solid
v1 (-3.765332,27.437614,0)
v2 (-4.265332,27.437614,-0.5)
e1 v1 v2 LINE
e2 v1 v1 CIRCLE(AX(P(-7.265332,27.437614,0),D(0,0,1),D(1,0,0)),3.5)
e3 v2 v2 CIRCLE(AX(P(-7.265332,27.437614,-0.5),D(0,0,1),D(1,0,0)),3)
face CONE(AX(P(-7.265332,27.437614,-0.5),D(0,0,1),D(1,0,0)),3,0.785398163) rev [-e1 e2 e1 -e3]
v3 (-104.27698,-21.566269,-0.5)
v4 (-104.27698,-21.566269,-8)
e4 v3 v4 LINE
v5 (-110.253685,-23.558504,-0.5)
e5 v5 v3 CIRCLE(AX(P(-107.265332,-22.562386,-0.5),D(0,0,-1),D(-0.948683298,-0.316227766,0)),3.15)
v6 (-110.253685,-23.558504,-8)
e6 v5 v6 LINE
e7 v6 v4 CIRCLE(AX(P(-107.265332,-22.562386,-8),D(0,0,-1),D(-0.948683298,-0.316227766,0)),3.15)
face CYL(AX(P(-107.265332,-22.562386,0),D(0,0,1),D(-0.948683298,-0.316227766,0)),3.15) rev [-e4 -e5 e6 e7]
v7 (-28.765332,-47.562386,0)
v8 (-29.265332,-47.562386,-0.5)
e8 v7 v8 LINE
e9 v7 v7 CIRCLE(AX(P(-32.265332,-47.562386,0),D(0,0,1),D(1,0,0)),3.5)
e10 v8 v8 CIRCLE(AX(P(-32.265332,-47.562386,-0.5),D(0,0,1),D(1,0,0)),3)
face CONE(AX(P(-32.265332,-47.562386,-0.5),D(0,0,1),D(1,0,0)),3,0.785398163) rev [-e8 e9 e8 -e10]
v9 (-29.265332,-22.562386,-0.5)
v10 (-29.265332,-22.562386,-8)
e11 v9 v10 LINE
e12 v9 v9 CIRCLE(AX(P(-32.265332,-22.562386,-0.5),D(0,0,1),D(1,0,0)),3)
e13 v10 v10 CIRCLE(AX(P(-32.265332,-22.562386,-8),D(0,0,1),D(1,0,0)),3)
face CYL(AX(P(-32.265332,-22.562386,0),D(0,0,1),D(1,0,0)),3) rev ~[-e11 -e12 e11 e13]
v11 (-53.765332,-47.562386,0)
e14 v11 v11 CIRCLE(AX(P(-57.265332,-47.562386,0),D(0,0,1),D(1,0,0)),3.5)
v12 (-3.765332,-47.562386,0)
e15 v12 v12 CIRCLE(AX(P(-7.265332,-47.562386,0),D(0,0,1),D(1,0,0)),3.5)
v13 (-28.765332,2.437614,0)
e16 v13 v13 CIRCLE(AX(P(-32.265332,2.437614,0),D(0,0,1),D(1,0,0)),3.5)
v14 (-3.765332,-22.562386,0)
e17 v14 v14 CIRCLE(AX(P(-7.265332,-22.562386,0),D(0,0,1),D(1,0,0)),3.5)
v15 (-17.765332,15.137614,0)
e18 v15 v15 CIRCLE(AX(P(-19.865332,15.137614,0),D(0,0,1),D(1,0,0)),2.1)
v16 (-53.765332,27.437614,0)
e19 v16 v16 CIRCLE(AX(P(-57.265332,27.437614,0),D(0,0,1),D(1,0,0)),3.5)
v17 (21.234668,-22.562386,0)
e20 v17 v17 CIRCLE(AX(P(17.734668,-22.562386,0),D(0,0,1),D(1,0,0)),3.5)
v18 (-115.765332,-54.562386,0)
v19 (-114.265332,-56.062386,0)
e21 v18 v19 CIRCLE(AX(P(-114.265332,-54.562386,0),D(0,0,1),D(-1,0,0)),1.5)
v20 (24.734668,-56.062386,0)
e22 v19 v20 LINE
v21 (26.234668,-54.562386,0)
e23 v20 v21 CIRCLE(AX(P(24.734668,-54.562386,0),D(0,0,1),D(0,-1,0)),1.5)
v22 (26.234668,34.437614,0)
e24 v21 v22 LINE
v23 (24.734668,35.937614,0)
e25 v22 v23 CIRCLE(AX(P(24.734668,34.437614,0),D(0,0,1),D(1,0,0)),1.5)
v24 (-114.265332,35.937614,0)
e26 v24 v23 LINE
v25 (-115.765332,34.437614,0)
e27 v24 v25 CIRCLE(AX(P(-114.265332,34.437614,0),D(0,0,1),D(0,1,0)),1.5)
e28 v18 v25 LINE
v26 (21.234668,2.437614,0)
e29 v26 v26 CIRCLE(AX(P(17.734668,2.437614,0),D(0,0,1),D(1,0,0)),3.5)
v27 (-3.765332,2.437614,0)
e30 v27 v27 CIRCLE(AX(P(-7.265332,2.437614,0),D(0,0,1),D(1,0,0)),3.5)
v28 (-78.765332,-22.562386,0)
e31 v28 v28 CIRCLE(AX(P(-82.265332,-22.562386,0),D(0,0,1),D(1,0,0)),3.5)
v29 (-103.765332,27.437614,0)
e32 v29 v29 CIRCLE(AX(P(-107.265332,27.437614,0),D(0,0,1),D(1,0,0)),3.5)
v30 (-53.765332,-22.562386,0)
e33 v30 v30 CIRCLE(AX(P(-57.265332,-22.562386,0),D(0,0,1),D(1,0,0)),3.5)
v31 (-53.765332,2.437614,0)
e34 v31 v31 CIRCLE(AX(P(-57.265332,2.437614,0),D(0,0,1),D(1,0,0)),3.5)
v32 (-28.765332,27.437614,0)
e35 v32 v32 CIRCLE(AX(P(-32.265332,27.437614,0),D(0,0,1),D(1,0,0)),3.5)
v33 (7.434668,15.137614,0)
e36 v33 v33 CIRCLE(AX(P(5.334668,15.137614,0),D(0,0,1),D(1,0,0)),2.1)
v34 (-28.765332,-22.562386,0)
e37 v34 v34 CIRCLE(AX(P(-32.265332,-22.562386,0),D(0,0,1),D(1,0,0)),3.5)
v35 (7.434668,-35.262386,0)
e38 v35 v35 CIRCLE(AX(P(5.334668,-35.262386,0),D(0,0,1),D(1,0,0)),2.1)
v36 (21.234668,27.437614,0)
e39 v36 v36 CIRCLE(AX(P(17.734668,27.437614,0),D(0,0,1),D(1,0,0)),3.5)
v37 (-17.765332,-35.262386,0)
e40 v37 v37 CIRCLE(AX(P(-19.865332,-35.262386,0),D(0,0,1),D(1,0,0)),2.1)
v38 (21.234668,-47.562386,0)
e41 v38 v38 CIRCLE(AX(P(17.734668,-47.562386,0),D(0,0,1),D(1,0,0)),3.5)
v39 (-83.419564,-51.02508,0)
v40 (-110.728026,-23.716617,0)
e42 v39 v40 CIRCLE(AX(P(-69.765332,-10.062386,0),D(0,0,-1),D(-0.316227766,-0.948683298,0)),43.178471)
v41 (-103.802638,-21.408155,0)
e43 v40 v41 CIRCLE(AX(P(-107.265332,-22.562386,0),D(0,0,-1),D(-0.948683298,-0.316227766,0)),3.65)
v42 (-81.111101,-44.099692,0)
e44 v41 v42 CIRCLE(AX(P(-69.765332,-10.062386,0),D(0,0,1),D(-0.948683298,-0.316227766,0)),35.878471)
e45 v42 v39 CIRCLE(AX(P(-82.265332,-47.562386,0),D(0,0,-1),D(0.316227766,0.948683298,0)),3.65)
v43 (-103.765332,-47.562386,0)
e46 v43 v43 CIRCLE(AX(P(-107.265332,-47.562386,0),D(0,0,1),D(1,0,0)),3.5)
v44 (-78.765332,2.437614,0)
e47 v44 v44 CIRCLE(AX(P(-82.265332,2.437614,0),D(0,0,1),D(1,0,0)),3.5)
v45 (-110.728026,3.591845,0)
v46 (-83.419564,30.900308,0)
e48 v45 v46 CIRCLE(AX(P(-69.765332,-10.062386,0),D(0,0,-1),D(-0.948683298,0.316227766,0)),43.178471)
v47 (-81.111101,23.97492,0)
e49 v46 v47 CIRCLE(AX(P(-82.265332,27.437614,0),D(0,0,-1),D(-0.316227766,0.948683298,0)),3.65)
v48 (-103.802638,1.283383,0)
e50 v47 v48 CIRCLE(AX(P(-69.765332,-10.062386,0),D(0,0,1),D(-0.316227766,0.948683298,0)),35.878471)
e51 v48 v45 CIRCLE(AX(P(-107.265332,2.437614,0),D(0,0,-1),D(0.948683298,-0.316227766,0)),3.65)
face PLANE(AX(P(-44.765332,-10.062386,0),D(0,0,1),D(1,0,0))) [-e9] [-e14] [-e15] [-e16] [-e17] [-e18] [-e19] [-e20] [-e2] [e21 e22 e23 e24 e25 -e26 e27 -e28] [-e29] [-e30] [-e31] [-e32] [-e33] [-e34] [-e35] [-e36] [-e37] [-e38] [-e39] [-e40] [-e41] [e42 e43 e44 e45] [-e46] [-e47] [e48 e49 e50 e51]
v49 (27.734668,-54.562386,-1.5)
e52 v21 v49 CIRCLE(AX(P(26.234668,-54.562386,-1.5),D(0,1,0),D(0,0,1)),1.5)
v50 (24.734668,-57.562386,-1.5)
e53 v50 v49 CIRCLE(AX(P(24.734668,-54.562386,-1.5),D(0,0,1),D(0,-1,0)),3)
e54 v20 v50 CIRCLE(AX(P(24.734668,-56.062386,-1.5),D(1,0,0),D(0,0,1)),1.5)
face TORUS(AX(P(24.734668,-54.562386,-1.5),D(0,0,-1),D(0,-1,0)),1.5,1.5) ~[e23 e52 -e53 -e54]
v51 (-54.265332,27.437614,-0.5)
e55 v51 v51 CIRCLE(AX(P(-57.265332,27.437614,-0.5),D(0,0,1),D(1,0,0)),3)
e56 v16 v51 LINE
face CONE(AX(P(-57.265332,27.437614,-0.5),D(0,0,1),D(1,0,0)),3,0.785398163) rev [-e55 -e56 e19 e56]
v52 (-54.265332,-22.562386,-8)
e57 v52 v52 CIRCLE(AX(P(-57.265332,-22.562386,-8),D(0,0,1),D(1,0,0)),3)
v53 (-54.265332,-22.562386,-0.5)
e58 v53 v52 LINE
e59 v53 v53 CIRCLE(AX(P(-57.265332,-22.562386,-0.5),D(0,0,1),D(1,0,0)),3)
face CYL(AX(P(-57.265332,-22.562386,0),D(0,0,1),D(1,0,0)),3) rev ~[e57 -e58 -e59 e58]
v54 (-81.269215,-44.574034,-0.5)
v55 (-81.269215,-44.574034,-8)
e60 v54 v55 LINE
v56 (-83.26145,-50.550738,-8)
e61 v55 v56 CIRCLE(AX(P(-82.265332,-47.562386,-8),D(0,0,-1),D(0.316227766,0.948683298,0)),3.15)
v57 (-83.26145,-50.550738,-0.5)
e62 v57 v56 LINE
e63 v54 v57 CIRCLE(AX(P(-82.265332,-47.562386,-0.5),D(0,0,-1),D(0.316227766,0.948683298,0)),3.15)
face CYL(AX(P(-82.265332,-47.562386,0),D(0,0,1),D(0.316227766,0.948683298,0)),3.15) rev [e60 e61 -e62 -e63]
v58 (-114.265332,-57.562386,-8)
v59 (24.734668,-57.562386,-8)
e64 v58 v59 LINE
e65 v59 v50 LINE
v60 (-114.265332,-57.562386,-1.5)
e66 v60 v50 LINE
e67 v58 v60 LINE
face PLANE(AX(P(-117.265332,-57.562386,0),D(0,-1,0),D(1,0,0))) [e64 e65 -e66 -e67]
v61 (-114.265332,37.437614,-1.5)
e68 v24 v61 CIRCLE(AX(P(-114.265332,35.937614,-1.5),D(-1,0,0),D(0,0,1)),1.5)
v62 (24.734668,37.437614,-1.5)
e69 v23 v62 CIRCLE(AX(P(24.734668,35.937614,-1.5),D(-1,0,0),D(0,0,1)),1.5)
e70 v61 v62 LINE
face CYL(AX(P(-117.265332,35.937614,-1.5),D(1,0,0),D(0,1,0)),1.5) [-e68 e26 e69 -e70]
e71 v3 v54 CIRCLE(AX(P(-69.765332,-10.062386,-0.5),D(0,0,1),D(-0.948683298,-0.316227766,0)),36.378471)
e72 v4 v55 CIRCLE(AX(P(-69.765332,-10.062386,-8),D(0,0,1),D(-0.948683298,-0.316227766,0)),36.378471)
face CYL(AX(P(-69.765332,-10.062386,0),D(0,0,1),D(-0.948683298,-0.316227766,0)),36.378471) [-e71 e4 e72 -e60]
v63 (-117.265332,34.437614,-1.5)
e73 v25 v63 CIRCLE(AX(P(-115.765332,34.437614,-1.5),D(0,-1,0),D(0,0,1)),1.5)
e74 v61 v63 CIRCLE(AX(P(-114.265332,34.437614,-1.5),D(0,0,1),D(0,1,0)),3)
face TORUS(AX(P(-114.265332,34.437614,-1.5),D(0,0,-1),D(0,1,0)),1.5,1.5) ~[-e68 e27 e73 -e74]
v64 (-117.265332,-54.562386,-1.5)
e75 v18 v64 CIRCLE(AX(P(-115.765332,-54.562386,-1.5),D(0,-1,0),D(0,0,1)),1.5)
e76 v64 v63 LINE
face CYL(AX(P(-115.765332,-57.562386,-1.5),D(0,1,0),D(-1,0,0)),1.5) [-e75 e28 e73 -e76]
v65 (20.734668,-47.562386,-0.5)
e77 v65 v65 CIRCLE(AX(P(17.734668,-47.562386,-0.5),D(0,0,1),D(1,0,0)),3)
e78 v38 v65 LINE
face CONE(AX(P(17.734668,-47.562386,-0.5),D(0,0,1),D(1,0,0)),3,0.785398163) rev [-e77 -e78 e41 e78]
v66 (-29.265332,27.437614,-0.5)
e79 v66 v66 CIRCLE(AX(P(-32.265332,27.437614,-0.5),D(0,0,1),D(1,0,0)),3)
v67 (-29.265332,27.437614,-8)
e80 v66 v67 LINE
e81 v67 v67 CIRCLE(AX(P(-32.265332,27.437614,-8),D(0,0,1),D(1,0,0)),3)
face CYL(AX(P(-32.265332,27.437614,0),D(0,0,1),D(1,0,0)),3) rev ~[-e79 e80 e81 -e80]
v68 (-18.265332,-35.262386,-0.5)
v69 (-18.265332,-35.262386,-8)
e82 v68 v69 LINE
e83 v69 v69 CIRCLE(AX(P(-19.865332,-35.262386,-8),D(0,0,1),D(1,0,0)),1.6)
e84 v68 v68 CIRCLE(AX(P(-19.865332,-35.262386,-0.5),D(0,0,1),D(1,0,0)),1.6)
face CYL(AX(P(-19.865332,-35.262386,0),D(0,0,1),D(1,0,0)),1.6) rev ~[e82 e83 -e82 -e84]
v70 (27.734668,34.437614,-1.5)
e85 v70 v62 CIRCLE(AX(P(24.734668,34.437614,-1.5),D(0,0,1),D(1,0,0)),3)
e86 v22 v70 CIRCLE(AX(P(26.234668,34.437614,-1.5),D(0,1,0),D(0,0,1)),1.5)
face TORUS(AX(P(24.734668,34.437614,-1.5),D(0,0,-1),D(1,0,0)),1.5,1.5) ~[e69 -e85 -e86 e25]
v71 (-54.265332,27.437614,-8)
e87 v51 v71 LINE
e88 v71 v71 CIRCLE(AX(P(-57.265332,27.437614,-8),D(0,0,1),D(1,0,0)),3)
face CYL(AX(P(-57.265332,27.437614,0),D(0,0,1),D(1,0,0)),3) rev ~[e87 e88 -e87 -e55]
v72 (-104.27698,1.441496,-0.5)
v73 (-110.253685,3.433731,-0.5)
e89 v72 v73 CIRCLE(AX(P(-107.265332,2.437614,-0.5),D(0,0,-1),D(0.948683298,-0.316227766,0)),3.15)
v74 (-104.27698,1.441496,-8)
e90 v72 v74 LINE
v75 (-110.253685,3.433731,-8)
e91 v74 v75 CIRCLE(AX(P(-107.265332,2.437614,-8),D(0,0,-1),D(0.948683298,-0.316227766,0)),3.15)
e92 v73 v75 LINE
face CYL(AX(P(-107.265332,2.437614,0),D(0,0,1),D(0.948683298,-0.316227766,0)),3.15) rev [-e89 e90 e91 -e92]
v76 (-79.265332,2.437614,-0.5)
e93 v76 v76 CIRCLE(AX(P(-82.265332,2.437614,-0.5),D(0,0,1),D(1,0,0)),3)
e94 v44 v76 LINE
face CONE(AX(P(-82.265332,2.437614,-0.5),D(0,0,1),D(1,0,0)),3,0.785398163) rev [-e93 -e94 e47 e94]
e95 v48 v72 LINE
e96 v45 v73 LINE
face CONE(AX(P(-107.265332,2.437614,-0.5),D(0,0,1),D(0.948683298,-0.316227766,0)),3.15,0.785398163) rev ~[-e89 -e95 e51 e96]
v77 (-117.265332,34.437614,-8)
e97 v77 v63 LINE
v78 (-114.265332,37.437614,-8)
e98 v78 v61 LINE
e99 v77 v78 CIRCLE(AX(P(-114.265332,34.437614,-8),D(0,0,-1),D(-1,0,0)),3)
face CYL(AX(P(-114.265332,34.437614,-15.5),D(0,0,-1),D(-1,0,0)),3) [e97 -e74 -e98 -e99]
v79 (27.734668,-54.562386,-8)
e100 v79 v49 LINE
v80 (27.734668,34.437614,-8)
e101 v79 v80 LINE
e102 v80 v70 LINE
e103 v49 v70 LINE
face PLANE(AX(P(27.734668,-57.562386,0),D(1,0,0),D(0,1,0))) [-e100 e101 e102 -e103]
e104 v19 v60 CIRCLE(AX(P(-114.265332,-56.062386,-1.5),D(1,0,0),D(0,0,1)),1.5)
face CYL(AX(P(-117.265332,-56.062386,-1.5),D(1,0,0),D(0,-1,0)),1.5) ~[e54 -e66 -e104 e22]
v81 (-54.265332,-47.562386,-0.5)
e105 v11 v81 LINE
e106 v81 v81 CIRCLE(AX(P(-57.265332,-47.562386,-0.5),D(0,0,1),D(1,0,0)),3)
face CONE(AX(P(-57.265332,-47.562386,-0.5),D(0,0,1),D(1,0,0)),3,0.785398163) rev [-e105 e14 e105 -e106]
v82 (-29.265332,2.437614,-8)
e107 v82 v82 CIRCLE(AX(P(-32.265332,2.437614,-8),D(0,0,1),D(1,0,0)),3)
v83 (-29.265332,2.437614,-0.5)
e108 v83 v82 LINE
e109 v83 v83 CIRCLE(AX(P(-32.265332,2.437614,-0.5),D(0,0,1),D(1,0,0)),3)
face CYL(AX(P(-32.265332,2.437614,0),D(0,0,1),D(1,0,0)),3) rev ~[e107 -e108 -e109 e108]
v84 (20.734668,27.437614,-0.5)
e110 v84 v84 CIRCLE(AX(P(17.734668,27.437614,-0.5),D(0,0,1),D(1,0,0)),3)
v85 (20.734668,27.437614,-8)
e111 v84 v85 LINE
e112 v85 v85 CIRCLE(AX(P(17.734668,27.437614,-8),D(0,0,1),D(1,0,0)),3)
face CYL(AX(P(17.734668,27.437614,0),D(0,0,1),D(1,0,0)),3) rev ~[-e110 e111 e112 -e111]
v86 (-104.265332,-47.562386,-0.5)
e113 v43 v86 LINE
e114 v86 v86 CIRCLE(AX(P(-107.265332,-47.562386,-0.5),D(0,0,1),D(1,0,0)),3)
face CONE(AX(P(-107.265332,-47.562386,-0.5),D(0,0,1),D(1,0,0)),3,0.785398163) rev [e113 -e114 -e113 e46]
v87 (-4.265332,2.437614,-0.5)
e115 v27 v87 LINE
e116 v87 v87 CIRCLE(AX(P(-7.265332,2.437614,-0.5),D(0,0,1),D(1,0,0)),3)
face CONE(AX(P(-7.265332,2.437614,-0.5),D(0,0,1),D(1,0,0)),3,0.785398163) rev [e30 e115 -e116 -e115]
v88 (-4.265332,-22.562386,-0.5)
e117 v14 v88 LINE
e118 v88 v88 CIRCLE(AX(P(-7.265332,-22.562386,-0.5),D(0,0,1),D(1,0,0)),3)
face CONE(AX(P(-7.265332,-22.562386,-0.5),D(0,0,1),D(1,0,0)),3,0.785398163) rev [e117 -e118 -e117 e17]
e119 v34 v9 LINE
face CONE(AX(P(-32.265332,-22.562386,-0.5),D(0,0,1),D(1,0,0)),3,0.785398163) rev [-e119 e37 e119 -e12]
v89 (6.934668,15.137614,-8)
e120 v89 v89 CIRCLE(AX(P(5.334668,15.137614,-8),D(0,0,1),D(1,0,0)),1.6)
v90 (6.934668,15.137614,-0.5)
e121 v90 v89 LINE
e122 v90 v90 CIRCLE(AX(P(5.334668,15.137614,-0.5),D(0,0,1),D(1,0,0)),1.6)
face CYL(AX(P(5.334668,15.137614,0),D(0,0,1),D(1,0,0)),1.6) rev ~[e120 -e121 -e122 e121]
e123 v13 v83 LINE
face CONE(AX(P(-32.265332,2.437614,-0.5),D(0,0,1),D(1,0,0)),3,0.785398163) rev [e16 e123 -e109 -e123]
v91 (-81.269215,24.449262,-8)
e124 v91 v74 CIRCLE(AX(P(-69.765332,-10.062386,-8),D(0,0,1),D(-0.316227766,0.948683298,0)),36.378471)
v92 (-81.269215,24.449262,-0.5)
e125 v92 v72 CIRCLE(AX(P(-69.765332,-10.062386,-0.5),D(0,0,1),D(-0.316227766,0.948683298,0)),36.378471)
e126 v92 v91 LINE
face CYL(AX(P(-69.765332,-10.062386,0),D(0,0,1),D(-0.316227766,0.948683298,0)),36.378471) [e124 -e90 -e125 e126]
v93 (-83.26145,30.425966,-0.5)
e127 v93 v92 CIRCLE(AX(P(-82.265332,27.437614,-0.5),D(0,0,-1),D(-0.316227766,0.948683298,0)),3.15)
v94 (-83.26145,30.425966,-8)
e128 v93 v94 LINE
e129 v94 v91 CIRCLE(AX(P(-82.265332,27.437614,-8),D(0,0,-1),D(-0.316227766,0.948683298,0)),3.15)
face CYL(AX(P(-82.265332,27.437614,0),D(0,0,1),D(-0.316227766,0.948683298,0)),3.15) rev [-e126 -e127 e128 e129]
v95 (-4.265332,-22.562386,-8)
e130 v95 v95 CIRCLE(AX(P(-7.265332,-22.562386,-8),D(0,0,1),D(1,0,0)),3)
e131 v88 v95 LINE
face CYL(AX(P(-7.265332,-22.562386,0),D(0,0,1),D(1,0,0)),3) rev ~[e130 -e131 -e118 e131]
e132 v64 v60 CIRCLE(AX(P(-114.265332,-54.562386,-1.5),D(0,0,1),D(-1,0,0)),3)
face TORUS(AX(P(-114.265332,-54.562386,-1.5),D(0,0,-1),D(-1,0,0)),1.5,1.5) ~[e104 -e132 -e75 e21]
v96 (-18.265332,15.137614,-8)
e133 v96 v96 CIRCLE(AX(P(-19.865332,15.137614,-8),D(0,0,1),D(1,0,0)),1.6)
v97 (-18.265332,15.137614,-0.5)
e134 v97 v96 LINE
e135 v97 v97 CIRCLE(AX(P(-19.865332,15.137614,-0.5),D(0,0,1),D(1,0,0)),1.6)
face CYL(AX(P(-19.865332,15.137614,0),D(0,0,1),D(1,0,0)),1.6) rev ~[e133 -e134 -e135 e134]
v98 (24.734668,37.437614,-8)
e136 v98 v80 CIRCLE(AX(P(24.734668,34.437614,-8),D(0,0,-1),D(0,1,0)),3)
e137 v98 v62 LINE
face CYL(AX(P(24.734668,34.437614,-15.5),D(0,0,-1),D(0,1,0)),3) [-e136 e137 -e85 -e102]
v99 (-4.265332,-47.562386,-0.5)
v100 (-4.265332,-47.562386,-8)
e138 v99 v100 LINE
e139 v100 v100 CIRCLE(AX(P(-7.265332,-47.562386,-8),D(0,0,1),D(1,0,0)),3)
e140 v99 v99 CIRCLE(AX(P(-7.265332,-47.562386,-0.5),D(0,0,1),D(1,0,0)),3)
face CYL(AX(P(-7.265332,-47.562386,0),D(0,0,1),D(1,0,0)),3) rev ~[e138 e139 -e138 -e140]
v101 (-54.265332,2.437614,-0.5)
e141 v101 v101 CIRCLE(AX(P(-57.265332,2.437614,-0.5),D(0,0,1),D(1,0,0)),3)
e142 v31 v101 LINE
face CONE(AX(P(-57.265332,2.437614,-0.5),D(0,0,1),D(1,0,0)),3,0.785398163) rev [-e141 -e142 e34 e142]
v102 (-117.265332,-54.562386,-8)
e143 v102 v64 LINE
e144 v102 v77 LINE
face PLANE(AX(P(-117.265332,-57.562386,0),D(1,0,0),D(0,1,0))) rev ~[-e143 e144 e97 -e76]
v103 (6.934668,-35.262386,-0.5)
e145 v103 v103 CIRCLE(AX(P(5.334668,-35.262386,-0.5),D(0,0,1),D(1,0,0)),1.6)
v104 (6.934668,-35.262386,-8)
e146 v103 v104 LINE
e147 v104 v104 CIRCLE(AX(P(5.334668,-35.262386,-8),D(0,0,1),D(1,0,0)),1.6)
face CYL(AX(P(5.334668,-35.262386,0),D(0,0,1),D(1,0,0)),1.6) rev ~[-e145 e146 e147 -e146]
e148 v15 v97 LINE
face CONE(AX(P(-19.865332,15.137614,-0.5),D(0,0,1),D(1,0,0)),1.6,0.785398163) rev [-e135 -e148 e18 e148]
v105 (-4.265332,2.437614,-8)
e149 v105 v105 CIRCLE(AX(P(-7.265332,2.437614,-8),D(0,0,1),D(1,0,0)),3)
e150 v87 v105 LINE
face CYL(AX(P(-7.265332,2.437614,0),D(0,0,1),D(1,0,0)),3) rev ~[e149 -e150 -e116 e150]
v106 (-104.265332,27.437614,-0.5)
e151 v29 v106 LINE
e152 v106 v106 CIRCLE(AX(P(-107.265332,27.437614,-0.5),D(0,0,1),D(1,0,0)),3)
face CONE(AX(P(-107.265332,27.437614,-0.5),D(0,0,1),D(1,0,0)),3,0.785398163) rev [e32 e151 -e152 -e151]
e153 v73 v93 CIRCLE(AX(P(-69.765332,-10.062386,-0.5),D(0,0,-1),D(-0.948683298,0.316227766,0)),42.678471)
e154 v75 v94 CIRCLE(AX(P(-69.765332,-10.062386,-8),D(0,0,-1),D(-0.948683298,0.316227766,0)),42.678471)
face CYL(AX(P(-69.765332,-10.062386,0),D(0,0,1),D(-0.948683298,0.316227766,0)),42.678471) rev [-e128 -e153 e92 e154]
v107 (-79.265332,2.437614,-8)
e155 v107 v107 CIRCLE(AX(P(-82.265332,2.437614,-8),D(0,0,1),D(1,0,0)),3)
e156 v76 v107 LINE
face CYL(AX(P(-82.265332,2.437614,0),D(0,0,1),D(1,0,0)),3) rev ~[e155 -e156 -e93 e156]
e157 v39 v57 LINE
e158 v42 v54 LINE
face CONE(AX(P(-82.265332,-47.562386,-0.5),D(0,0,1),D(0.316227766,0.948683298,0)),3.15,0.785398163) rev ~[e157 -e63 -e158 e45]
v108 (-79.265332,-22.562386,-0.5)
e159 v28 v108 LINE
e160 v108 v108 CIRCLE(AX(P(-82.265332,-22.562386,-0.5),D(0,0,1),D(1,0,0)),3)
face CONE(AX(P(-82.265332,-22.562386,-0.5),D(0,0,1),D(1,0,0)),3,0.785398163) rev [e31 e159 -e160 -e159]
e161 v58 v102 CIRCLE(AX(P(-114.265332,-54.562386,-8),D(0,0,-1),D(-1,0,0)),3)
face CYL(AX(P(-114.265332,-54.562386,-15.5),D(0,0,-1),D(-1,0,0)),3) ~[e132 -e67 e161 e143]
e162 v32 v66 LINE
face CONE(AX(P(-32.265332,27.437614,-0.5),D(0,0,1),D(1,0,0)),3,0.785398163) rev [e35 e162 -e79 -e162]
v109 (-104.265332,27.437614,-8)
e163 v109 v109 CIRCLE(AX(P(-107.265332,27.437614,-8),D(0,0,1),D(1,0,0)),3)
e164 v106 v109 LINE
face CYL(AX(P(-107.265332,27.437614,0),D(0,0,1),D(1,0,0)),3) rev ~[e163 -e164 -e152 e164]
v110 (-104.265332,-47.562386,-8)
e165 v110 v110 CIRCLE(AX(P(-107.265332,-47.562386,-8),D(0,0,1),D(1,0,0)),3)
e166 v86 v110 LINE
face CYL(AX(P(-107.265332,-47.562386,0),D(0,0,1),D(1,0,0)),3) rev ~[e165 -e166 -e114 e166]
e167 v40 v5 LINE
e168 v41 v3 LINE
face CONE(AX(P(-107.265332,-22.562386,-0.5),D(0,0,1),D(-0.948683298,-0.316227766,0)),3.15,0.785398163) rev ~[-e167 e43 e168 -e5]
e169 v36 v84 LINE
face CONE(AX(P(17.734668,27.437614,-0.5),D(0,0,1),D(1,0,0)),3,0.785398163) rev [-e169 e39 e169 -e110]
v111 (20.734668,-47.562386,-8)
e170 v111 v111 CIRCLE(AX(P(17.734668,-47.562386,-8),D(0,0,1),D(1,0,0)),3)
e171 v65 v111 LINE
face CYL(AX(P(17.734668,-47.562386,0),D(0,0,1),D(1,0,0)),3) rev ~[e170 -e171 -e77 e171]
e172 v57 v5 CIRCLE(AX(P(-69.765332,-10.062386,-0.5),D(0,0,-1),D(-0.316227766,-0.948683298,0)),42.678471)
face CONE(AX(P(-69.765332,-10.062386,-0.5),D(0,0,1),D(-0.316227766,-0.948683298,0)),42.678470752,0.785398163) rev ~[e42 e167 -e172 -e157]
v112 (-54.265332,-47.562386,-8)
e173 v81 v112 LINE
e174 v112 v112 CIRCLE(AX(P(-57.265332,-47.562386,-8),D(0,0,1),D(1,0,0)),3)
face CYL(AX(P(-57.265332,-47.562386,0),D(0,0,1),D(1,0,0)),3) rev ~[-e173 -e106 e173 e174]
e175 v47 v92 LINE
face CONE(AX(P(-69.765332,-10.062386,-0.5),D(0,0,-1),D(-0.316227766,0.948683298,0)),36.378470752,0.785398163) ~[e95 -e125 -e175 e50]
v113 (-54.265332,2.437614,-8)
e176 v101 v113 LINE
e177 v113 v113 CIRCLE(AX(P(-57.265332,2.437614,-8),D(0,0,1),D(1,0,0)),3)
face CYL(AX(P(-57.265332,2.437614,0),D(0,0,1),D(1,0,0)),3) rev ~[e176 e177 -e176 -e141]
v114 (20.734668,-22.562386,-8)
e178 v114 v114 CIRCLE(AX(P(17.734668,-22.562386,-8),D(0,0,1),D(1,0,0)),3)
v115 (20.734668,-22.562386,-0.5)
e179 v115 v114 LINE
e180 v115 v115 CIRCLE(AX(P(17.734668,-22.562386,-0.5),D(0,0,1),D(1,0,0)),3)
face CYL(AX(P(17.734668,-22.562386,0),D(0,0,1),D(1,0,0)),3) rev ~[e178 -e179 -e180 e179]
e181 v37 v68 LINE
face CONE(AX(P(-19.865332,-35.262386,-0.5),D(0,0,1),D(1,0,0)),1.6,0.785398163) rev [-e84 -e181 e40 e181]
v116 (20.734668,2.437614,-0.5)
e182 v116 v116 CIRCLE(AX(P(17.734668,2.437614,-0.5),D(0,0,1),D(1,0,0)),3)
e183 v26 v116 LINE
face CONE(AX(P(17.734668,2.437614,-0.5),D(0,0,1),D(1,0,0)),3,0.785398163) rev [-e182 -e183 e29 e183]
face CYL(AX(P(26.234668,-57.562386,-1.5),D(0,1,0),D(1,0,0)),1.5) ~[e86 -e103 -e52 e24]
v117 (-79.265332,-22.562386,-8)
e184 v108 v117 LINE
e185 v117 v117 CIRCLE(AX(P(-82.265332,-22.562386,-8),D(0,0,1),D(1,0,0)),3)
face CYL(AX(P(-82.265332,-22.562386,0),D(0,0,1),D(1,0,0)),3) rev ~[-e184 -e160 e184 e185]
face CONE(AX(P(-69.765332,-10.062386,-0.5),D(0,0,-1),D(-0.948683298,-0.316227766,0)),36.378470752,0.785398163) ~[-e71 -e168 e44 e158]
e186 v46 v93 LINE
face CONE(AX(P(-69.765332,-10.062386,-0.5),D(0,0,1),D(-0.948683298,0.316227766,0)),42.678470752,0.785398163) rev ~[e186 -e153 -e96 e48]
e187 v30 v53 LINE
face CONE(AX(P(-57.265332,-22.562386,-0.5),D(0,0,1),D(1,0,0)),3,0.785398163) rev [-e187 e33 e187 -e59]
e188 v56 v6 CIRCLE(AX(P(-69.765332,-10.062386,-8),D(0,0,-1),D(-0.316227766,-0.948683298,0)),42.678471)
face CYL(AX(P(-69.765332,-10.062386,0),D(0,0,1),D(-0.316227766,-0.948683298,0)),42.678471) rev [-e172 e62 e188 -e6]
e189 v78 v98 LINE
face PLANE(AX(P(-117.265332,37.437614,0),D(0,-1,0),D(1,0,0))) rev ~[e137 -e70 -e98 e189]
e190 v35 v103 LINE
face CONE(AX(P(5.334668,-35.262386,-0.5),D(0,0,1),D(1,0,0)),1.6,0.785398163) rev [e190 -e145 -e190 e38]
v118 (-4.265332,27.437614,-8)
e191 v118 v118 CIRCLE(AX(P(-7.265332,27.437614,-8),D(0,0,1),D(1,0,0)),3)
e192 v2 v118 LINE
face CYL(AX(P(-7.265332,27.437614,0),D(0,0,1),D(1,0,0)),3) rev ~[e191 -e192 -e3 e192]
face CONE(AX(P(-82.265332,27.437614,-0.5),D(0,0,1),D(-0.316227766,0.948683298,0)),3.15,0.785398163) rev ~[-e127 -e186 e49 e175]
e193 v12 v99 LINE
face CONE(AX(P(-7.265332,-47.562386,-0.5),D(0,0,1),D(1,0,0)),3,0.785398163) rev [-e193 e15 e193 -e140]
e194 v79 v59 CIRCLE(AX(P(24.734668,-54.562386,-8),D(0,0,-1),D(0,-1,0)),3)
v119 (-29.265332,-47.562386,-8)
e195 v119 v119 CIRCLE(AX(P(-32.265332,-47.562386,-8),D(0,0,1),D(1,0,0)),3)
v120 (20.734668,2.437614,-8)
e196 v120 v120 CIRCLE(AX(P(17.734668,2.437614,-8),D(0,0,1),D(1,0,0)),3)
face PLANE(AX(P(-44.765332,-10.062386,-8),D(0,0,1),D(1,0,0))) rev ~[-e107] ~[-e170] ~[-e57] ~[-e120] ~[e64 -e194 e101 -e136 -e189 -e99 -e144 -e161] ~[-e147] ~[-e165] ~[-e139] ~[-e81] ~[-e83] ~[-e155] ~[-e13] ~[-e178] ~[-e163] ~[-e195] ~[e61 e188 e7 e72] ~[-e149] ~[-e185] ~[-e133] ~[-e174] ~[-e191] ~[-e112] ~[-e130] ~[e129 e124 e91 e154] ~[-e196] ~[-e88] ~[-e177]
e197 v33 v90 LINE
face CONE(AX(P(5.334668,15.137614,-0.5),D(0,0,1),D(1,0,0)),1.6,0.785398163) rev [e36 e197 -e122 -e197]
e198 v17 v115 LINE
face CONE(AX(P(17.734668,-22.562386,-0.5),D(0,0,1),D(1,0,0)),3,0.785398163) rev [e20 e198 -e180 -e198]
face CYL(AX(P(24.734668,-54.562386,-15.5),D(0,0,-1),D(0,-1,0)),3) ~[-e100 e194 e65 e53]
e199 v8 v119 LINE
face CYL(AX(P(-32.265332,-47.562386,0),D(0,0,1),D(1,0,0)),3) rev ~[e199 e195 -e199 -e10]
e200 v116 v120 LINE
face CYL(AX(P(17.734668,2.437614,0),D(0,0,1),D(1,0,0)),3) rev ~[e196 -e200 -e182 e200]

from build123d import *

# Parameters (mm, degrees)
F0_W         = 145
F0_H         = 95
F0_R         = 3
F0_R_2       = 1.6
F1_DEPTH     = 8
F2_R         = 1.5
F3_SIZE      = 0.5
F4_T1_DEPTH  = 15.5
F4_T4_ANGLE  = 90
F4_T6_ANGLE  = 90
F4_T8_ANGLE  = 90
F4_T10_ANGLE = 90


# Not quite as in the source:
# - a fillet or chamfer that OpenCascade refuses, or shapes differently, is made with other operations: its cross-section is extruded or revolved along the edge and cut away or added
# - a feature names something its author has since deleted; it is built from what else it names


with BuildPart() as f1:
    # F0 (on Top) → F1 (new body)
    with BuildSketch(Plane.XY):
        with Locations((-44.7653323412, -10.0623860955)):
            Rectangle(F0_W, F0_H)
        with Locations((-107.2653323412, -47.5623860955)):
            Circle(F0_R, mode=Mode.SUBTRACT)
        with BuildLine():
            ThreePointArc((-83.2614498041, -50.5507384844), (-99.9435684207, -40.240622175), (-110.2536847301, -23.5585035585))
            ThreePointArc((-110.2536847301, -23.5585035585), (-108.2614498041, -19.5740337067), (-104.2769799523, -21.5662686326))
            ThreePointArc((-104.2769799523, -21.5662686326), (-95.4887956992, -35.7858494535), (-81.2692148782, -44.5740337067))
            ThreePointArc((-81.2692148782, -44.5740337067), (-79.2769799523, -48.5585035585), (-83.2614498041, -50.5507384844))
        make_face(mode=Mode.SUBTRACT)
        with Locations((-57.2653323412, -47.5623860955)):
            Circle(F0_R, mode=Mode.SUBTRACT)
        with Locations((-82.2653323412, -22.5623860955)):
            Circle(F0_R, mode=Mode.SUBTRACT)
        with Locations((-57.2653323412, -22.5623860955)):
            Circle(F0_R, mode=Mode.SUBTRACT)
        with Locations((-32.2653323412, -47.5623860955)):
            Circle(F0_R, mode=Mode.SUBTRACT)
        with Locations((-19.8653323412, -35.2623860955)):
            Circle(F0_R_2, mode=Mode.SUBTRACT)
        with Locations((-7.2653323412, -47.5623860955)):
            Circle(F0_R, mode=Mode.SUBTRACT)
        with Locations((17.7346676588, -47.5623860955)):
            Circle(F0_R, mode=Mode.SUBTRACT)
        with Locations((5.3346676588, -35.2623860955)):
            Circle(F0_R_2, mode=Mode.SUBTRACT)
        with Locations((-32.2653323412, -22.5623860955)):
            Circle(F0_R, mode=Mode.SUBTRACT)
        with Locations((-7.2653323412, -22.5623860955)):
            Circle(F0_R, mode=Mode.SUBTRACT)
        with Locations((17.7346676588, -22.5623860955)):
            Circle(F0_R, mode=Mode.SUBTRACT)
        with Locations((-82.2653323412, 2.4376139045)):
            Circle(F0_R, mode=Mode.SUBTRACT)
        with Locations((-57.2653323412, 2.4376139045)):
            Circle(F0_R, mode=Mode.SUBTRACT)
        with BuildLine():
            ThreePointArc((-110.2536847301, 3.4337313674), (-99.9435684207, 20.115849984), (-83.2614498041, 30.4259662933))
            ThreePointArc((-83.2614498041, 30.4259662933), (-79.2769799523, 28.4337313674), (-81.2692148782, 24.4492615156))
            ThreePointArc((-81.2692148782, 24.4492615156), (-95.4887956992, 15.6610772625), (-104.2769799523, 1.4414964415))
            ThreePointArc((-104.2769799523, 1.4414964415), (-108.2614498041, -0.5507384844), (-110.2536847301, 3.4337313674))
        make_face(mode=Mode.SUBTRACT)
        with Locations((-107.2653323412, 27.4376139045)):
            Circle(F0_R, mode=Mode.SUBTRACT)
        with Locations((-57.2653323412, 27.4376139045)):
            Circle(F0_R, mode=Mode.SUBTRACT)
        with Locations((-32.2653323412, 2.4376139045)):
            Circle(F0_R, mode=Mode.SUBTRACT)
        with Locations((-7.2653323412, 2.4376139045)):
            Circle(F0_R, mode=Mode.SUBTRACT)
        with Locations((17.7346676588, 2.4376139045)):
            Circle(F0_R, mode=Mode.SUBTRACT)
        with Locations((-19.8653323412, 15.1376139045)):
            Circle(F0_R_2, mode=Mode.SUBTRACT)
        with Locations((-32.2653323412, 27.4376139045)):
            Circle(F0_R, mode=Mode.SUBTRACT)
        with Locations((5.3346676588, 15.1376139045)):
            Circle(F0_R_2, mode=Mode.SUBTRACT)
        with Locations((-7.2653323412, 27.4376139045)):
            Circle(F0_R, mode=Mode.SUBTRACT)
        with Locations((17.7346676588, 27.4376139045)):
            Circle(F0_R, mode=Mode.SUBTRACT)
    extrude(amount=-F1_DEPTH)

    # F2
    f2_edges = [f1.edges().sort_by_distance(p)[0] for p in [
        (-117.265332, -10.062386, 0),
        (-44.765332, 37.437614, 0),
        (-44.765332, -57.562386, 0),
        (27.734668, -10.062386, 0),
    ]]
    fillet(f2_edges, radius=F2_R)

    # F3
    f3_edges = [f1.edges().sort_by_distance(p)[0] for p in [
        (-115.765332, -10.062386, 0),
        (-44.765332, 35.937614, 0),
        (-44.765332, -56.062386, 0),
        (26.234668, -10.062386, 0),
        (-110.265332, -47.562386, 0),
        (-95.488796, -35.785849, 0),
        (-79.27698, -48.558504, 0),
        (-99.943568, -40.240622, 0),
        (-108.26145, -19.574034, 0),
        (-60.265332, -47.562386, 0),
        (-85.265332, -22.562386, 0),
        (-60.265332, -22.562386, 0),
        (-35.265332, -47.562386, 0),
        (-21.465332, -35.262386, 0),
        (-10.265332, -47.562386, 0),
        (14.734668, -47.562386, 0),
        (3.734668, -35.262386, 0),
        (-35.265332, -22.562386, 0),
        (-10.265332, -22.562386, 0),
        (14.734668, -22.562386, 0),
        (-85.265332, 2.437614, 0),
        (-60.265332, 2.437614, 0),
        (-99.943568, 20.11585, 0),
        (-79.27698, 28.433731, 0),
        (-95.488796, 15.661077, 0),
        (-108.26145, -0.550738, 0),
        (-110.265332, 27.437614, 0),
        (-60.265332, 27.437614, 0),
        (-35.265332, 2.437614, 0),
        (-10.265332, 2.437614, 0),
        (14.734668, 2.437614, 0),
        (-21.465332, 15.137614, 0),
        (-35.265332, 27.437614, 0),
        (3.734668, 15.137614, 0),
        (-10.265332, 27.437614, 0),
        (14.734668, 27.437614, 0),
    ]]
    chamfer(f3_edges, length=F3_SIZE)

    # F4: fillet of radius 3 on 4 edges, made by hand

    # F4_s2 → F4_t1 (cut)
    with BuildSketch(Plane.XY.offset(-15.5)):
        with BuildLine():
            ThreePointArc((-117.2653323412, -54.5623860955), (-116.3866526848, -56.6837064391), (-114.2653323412, -57.5623860955))
            Line((-114.2653323412, -57.5623860955), (-117.2653323412, -57.5623860955))
            Line((-117.2653323412, -57.5623860955), (-117.2653323412, -54.5623860955))
        make_face()
        with BuildLine():
            ThreePointArc((24.7346676588, -57.5623860955), (26.8559880024, -56.6837064391), (27.7346676588, -54.5623860955))
            Line((27.7346676588, -54.5623860955), (27.7346676588, -57.5623860955))
            Line((27.7346676588, -57.5623860955), (24.7346676588, -57.5623860955))
        make_face()
        with BuildLine():
            ThreePointArc((24.7346676588, 37.4376139045), (26.8559880024, 36.558934248), (27.7346676588, 34.4376139045))
            Line((27.7346676588, 34.4376139045), (27.7346676588, 37.4376139045))
            Line((27.7346676588, 37.4376139045), (24.7346676588, 37.4376139045))
        make_face()
        with BuildLine():
            ThreePointArc((-117.2653323412, 34.4376139045), (-116.3866526848, 36.558934248), (-114.2653323412, 37.4376139045))
            Line((-114.2653323412, 37.4376139045), (-117.2653323412, 37.4376139045))
            Line((-117.2653323412, 37.4376139045), (-117.2653323412, 34.4376139045))
        make_face()
    extrude(amount=F4_T1_DEPTH, mode=Mode.SUBTRACT)

    # F4_s3 → F4_t4 (revolve, cut)
    with BuildSketch(Plane.YZ.offset(-114.2653323412)):
        with BuildLine():
            ThreePointArc((35.9376139045, 0), (36.9982740763, -0.4393398282), (37.4376139045, -1.5))
            Line((37.4376139045, -1.5), (37.4376139045, 0))
            Line((37.4376139045, 0), (35.9376139045, 0))
        make_face()
    revolve(axis=Axis((-114.2653323412, 34.4376139045, 0), (0, 0, 1)), revolution_arc=F4_T4_ANGLE, mode=Mode.SUBTRACT)

    # F4_s5 → F4_t6 (revolve, cut)
    with BuildSketch(Plane.XZ.offset(-34.4376139045)):
        with BuildLine():
            ThreePointArc((26.2346676588, 0), (27.2953278306, -0.4393398282), (27.7346676588, -1.5))
            Line((27.7346676588, -1.5), (27.7346676588, 0))
            Line((27.7346676588, 0), (26.2346676588, 0))
        make_face()
    revolve(axis=Axis((24.7346676588, 34.4376139045, 0), (0, 0, 1)), revolution_arc=F4_T6_ANGLE, mode=Mode.SUBTRACT)

    # F4_s7 → F4_t8 (revolve, cut)
    with BuildSketch(Plane.YZ.offset(24.7346676588)):
        with BuildLine():
            ThreePointArc((-56.0623860955, 0), (-57.1230462673, -0.4393398282), (-57.5623860955, -1.5))
            Line((-57.5623860955, -1.5), (-57.5623860955, 0))
            Line((-57.5623860955, 0), (-56.0623860955, 0))
        make_face()
    revolve(axis=Axis((24.7346676588, -54.5623860955, 0), (0, 0, 1)), revolution_arc=F4_T8_ANGLE, mode=Mode.SUBTRACT)

    # F4_s9 → F4_t10 (revolve, cut)
    with BuildSketch(Plane.XZ.offset(54.5623860955)):
        with BuildLine():
            ThreePointArc((-115.7653323412, 0), (-116.825992513, -0.4393398282), (-117.2653323412, -1.5))
            Line((-117.2653323412, -1.5), (-117.2653323412, 0))
            Line((-117.2653323412, 0), (-115.7653323412, 0))
        make_face()
    revolve(axis=Axis((-114.2653323412, -54.5623860955, 0), (0, 0, 1)), revolution_arc=F4_T10_ANGLE, mode=Mode.SUBTRACT)


solid = f1.part
